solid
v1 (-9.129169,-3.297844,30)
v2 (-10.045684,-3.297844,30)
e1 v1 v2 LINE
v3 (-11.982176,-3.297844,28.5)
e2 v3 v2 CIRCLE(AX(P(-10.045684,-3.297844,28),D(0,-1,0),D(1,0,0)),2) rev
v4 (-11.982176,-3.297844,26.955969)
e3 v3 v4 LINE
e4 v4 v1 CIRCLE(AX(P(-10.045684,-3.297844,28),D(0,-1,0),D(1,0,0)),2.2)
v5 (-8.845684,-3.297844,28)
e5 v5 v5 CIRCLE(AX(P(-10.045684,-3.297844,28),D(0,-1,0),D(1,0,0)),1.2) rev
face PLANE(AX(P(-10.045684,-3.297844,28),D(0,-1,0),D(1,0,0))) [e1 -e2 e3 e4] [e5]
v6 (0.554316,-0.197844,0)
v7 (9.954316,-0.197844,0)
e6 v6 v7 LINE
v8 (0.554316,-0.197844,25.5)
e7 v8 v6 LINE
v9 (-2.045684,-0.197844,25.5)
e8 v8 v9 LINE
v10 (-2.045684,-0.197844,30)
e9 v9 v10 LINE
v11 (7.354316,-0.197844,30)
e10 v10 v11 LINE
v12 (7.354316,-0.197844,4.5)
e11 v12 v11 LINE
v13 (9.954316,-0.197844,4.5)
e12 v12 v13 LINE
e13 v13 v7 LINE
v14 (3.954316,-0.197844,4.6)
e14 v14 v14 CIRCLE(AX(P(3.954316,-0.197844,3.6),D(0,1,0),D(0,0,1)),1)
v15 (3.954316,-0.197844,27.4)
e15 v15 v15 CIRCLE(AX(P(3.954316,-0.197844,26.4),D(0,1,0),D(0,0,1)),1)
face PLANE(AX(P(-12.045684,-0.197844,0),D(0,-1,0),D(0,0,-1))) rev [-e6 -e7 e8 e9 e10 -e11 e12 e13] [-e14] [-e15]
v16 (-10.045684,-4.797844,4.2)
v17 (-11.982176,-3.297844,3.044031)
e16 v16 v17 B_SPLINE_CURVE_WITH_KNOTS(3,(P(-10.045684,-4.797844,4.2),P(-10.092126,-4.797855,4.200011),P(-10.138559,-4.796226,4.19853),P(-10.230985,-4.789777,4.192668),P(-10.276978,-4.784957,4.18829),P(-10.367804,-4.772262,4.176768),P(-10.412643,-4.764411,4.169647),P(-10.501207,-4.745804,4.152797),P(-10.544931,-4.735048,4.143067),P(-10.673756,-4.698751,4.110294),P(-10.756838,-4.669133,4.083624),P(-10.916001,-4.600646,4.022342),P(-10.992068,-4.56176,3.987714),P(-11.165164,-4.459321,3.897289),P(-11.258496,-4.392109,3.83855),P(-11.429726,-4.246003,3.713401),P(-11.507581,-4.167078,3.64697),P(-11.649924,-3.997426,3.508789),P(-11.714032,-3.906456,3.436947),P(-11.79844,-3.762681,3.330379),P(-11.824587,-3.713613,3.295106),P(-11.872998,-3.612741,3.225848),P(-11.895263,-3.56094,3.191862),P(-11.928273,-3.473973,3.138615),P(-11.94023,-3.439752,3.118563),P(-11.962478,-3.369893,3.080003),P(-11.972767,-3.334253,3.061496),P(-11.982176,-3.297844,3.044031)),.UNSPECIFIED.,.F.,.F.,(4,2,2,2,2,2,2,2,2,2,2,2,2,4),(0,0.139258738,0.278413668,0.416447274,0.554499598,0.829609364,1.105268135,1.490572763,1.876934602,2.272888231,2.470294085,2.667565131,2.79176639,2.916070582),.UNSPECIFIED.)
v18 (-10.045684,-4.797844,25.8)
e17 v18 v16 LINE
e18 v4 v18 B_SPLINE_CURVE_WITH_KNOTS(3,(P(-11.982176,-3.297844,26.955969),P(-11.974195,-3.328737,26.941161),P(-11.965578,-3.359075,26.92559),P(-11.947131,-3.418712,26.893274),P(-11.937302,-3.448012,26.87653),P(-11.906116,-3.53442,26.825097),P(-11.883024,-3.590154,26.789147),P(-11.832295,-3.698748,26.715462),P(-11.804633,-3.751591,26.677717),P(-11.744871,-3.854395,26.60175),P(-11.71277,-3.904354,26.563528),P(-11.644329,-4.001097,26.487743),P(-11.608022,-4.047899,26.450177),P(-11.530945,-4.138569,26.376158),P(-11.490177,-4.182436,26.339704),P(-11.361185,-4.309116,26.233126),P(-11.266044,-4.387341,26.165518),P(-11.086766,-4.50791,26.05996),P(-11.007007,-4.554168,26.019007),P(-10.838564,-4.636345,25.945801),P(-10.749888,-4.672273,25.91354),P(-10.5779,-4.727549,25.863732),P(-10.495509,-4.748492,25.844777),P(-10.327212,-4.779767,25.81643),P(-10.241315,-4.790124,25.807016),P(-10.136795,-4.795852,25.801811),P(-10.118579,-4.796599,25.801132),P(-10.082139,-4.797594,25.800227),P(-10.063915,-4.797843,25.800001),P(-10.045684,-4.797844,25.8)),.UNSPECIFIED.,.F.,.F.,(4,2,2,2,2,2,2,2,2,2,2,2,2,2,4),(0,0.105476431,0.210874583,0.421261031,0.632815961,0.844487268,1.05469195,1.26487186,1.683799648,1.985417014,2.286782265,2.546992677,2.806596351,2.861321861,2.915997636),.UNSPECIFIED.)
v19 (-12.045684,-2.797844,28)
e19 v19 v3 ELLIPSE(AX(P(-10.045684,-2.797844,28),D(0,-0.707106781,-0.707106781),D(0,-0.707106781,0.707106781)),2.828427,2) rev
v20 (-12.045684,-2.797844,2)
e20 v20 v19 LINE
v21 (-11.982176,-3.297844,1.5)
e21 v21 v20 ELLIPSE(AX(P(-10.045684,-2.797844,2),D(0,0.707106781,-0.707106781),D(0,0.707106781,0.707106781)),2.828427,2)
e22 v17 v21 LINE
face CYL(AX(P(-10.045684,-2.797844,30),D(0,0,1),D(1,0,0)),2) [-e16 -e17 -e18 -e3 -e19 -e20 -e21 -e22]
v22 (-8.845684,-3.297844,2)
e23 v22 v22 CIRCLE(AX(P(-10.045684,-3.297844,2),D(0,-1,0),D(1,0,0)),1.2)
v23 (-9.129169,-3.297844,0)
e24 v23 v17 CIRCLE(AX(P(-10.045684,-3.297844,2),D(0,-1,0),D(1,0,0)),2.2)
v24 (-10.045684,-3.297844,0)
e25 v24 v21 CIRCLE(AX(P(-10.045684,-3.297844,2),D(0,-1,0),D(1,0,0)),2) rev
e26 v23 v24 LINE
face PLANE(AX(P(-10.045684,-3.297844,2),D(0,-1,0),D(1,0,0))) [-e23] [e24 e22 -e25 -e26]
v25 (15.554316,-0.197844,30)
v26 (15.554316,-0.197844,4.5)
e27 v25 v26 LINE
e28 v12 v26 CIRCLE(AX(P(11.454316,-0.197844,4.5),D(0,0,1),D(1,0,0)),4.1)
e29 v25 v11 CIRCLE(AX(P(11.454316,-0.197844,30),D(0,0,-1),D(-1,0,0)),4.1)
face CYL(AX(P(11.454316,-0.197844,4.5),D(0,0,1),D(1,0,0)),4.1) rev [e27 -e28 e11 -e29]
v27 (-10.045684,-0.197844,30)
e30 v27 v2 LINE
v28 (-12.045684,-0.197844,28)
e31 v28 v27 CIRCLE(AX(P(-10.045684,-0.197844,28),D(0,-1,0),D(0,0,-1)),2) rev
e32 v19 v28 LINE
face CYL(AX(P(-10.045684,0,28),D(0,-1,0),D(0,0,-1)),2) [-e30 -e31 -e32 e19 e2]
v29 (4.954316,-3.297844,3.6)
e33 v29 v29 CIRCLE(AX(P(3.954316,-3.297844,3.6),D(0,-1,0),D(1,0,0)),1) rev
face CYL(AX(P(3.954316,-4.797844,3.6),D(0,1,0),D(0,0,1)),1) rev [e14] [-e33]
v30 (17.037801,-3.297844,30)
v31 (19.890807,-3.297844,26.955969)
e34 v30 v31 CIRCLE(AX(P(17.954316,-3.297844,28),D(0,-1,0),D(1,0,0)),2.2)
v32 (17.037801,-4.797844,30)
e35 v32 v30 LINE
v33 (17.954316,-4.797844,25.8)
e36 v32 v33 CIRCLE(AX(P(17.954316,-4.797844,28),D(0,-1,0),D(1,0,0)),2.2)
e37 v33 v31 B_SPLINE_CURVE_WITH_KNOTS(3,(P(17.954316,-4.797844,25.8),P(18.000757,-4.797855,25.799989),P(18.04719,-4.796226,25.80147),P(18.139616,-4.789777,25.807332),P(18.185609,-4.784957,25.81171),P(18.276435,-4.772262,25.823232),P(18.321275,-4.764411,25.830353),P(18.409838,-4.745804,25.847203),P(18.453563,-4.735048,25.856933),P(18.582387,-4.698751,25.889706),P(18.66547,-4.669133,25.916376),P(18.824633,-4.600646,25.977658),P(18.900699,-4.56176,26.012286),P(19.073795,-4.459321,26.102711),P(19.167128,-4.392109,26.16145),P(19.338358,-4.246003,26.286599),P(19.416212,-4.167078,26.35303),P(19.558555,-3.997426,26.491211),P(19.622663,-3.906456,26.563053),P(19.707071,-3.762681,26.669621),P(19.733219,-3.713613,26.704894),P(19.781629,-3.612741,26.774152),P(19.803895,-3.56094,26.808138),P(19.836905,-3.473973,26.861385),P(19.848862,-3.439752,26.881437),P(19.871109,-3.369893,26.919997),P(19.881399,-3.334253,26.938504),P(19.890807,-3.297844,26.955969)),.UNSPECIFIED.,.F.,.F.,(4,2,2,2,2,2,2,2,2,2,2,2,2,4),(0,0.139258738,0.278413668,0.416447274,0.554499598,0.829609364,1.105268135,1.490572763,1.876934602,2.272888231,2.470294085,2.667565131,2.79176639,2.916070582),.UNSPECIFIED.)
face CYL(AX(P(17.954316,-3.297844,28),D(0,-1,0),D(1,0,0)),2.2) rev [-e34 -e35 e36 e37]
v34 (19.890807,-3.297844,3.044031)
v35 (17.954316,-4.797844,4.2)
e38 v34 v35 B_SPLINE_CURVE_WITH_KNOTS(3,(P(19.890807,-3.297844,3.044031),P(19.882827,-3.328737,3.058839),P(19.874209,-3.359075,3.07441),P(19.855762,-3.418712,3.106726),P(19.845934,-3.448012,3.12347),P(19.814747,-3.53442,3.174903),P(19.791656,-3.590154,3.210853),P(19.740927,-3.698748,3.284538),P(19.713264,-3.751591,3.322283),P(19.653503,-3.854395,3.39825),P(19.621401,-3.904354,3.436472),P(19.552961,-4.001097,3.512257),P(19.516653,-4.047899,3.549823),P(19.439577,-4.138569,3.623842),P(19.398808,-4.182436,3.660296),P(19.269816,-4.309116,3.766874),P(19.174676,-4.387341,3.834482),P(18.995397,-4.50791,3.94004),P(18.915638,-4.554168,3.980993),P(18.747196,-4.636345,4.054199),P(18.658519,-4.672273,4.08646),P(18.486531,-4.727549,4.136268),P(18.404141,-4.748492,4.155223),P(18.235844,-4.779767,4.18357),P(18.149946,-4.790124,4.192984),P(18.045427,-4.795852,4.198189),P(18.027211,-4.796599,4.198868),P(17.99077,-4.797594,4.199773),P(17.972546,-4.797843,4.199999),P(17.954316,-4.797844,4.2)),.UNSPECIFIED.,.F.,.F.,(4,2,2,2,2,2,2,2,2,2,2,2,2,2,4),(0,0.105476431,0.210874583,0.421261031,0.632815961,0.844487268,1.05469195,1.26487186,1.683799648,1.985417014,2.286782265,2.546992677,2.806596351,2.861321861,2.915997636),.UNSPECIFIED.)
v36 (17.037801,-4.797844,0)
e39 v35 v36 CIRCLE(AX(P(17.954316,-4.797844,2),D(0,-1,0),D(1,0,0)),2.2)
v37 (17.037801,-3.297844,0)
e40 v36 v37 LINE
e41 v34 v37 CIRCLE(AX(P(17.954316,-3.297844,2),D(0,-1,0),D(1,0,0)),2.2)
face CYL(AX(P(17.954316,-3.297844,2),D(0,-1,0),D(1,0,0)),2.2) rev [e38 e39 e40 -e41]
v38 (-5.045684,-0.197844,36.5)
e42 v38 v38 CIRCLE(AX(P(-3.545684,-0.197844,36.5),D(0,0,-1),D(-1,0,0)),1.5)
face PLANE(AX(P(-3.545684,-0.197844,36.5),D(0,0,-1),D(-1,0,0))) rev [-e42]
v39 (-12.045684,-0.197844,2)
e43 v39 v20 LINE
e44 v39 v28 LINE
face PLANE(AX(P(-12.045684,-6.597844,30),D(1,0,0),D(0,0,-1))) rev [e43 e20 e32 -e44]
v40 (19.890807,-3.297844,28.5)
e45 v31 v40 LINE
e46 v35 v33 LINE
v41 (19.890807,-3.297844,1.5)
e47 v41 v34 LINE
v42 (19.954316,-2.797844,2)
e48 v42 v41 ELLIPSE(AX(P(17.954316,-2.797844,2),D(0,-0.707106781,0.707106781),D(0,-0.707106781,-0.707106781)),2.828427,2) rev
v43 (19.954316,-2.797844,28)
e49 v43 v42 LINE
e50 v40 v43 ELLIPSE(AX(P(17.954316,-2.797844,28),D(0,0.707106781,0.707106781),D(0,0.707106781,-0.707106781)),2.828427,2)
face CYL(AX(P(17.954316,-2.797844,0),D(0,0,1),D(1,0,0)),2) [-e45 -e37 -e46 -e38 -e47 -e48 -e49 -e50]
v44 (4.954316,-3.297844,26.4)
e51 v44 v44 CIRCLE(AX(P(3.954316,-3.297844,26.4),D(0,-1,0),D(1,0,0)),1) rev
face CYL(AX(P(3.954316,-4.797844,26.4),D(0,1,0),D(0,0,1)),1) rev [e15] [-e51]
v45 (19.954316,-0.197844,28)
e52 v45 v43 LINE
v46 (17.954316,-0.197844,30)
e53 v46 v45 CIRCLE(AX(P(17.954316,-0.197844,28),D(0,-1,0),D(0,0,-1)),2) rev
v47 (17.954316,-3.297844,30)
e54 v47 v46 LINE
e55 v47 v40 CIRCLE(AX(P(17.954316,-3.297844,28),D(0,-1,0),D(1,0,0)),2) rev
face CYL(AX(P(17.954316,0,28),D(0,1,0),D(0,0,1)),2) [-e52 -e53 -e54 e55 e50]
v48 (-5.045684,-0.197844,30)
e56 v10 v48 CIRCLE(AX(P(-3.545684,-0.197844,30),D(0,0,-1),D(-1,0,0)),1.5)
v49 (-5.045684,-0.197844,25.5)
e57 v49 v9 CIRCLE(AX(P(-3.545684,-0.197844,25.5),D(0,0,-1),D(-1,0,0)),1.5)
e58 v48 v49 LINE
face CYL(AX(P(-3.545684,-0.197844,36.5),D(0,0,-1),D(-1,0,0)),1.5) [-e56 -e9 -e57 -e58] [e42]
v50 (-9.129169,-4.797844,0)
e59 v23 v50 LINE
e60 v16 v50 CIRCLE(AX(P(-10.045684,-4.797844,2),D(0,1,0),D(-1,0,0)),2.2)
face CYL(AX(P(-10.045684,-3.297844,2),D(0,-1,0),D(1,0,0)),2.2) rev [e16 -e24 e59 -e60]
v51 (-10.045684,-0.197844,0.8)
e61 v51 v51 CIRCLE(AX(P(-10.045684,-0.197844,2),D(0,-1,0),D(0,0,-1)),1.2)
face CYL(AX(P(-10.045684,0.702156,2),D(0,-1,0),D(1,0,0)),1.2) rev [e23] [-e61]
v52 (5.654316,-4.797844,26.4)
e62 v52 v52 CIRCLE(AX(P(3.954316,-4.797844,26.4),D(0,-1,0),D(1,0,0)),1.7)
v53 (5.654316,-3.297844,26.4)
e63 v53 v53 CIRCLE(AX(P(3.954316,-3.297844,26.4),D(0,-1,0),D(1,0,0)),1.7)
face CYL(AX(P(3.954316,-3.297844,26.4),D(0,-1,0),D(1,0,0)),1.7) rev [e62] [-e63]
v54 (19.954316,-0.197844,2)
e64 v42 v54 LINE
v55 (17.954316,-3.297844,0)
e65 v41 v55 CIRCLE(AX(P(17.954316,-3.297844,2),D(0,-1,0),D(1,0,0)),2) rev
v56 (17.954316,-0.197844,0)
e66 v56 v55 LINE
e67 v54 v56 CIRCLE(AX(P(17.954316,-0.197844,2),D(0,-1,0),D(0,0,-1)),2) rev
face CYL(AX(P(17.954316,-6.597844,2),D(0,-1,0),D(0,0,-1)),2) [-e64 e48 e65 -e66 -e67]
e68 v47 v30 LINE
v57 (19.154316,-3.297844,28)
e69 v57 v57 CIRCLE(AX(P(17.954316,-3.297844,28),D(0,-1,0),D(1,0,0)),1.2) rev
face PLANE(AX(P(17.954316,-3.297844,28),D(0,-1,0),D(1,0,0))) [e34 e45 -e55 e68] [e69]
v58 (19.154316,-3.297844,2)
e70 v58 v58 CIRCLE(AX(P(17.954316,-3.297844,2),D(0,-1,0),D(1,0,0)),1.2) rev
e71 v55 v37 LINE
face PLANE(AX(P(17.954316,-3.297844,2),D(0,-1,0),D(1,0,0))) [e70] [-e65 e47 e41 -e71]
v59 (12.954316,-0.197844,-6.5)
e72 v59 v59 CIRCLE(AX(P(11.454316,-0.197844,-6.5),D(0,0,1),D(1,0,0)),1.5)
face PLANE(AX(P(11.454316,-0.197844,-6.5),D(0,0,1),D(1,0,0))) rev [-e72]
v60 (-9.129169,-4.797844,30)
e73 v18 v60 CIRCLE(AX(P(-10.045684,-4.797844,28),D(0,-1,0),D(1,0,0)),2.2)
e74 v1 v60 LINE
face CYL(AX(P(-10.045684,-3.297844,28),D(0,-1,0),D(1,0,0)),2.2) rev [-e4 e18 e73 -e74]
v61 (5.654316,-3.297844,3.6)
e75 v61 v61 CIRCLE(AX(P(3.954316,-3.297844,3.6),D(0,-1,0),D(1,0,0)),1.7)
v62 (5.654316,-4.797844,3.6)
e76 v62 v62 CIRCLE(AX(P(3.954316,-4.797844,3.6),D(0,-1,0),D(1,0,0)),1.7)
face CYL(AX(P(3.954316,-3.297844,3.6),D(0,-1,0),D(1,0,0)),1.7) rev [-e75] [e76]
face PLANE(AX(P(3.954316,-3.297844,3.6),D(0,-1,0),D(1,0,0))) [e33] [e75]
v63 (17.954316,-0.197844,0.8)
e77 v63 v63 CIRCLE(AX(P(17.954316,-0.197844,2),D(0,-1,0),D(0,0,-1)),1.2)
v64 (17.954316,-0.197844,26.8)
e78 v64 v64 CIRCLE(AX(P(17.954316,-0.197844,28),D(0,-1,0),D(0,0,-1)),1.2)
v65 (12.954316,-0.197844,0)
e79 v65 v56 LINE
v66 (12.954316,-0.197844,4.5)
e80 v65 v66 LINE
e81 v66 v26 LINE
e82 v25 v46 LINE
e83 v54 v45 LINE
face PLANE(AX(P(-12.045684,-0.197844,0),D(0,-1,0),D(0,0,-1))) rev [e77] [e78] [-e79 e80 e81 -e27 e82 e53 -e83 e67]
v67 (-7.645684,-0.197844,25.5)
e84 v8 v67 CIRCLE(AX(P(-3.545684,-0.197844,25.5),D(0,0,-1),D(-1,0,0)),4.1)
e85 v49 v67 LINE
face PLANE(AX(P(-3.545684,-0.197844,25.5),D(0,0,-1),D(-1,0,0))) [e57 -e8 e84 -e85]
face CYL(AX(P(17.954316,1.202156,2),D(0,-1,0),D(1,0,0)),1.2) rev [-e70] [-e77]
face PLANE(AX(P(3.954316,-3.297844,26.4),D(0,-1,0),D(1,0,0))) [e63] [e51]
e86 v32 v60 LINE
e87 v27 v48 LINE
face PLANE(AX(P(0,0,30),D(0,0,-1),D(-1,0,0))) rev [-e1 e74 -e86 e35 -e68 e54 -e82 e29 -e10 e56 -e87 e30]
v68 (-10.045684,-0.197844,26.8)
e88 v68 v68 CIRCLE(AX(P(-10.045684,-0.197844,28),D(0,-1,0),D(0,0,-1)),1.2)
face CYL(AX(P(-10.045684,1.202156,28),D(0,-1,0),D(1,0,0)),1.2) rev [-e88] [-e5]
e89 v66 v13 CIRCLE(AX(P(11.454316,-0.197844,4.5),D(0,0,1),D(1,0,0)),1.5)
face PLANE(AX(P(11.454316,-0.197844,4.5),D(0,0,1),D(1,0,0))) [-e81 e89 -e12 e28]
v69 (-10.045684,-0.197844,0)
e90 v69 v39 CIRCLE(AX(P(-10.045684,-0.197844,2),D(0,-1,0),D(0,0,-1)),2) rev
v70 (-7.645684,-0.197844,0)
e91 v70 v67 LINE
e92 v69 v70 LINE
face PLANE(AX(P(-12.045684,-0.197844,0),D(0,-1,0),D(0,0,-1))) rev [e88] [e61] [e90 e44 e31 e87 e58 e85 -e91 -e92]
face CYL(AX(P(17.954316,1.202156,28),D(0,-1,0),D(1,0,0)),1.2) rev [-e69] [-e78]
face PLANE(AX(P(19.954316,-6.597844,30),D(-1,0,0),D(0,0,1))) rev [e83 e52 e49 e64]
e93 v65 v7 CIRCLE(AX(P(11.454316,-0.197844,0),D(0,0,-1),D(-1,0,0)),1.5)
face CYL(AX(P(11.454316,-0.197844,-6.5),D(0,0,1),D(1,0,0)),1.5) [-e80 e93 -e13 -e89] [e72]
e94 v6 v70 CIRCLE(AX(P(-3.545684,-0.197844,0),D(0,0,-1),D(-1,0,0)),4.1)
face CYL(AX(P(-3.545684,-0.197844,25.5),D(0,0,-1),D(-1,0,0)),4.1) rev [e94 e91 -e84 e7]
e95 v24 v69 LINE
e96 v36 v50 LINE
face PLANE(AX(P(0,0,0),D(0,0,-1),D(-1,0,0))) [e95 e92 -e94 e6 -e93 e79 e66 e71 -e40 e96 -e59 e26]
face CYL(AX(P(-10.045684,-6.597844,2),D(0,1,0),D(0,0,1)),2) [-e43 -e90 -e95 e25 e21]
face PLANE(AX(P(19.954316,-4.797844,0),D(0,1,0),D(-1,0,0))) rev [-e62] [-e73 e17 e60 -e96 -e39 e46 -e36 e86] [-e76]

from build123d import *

# Parameters (mm, degrees)
SKETCH1_W           = 32
SKETCH1_H           = 6.5
BOSS_EXTRUDE1_DEPTH = 30
FILLET1_R           = 2
SKETCH2_R           = 4.1
CUT_EXTRUDE1_DEPTH  = 25.5
SKETCH3_R           = 4.1
CUT_EXTRUDE2_DEPTH  = 25.5
SKETCH5_W           = 32
SKETCH5_H           = 0.1
CUT_EXTRUDE3_DEPTH  = 37.629308734
SKETCH6_W           = 32
SKETCH6_H           = 1.8
CUT_EXTRUDE4_DEPTH  = 37.629308734
SKETCH7_R           = 2.2
CUT_EXTRUDE5_DEPTH  = 1.5
SKETCH8_R           = 1.2
CUT_EXTRUDE6_DEPTH  = 4
SKETCH9_R           = 1.2
CUT_EXTRUDE7_DEPTH  = 6
SKETCH10_R          = 2.2
CUT_EXTRUDE8_DEPTH  = 1.5
SKETCH11_R          = 1
CUT_EXTRUDE9_DEPTH  = 37.322647437
SKETCH12_R          = 1.7
CUT_EXTRUDE10_DEPTH = 1.5
SKETCH14_R          = 1.5
BOSS_EXTRUDE3_DEPTH = 11
SKETCH15_R          = 1.5
BOSS_EXTRUDE4_DEPTH = 11
FILLET2_R           = 2


with BuildPart() as part:
    # Sketch1 → Boss-Extrude1 (new body)
    with BuildSketch(Plane.XY):
        with Locations((3.954315745, -3.347843701)):
            Rectangle(SKETCH1_W, SKETCH1_H)
    extrude(amount=BOSS_EXTRUDE1_DEPTH)

    # Fillet1
    fillet1_edges = [part.edges().sort_by_distance(p)[0] for p in [
        (19.954315745, -3.347843701, 30),
        (-12.045684255, -3.347843701, 30),
        (19.954315745, -3.347843701, 0),
        (-12.045684255, -3.347843701, 0),
    ]]
    fillet(fillet1_edges, radius=FILLET1_R)

    # Sketch2 → Cut-Extrude1 (cut)
    with BuildSketch(Plane(origin=(0, 0, 0), x_dir=(-1, 0, 0), z_dir=(0, 0, -1))):
        with Locations((3.545684255, -0.197843701)):
            Circle(SKETCH2_R)
    extrude(amount=-CUT_EXTRUDE1_DEPTH, mode=Mode.SUBTRACT)

    # Sketch3 → Cut-Extrude2 (cut)
    with BuildSketch(Plane.XY.offset(30)):
        with Locations((11.454315745, -0.197843701)):
            Circle(SKETCH3_R)
    extrude(amount=-CUT_EXTRUDE2_DEPTH, mode=Mode.SUBTRACT)

    # Sketch5 → Cut-Extrude3 (cut, through all)
    with BuildSketch(Plane.XY.offset(30)):
        with Locations((3.954315745, -0.147843701)):
            Rectangle(SKETCH5_W, SKETCH5_H)
    extrude(amount=-CUT_EXTRUDE3_DEPTH, mode=Mode.SUBTRACT)

    # Sketch6 → Cut-Extrude4 (cut, through all)
    with BuildSketch(Plane.XY.offset(30)):
        with Locations((3.954315745, -5.697843701)):
            Rectangle(SKETCH6_W, SKETCH6_H)
    extrude(amount=-CUT_EXTRUDE4_DEPTH, mode=Mode.SUBTRACT)

    # Sketch7 → Cut-Extrude5 (cut)
    with BuildSketch(Plane.XZ.offset(4.797843701)):
        with Locations((-10.045684255, 2)):
            Circle(SKETCH7_R)
    extrude(amount=-CUT_EXTRUDE5_DEPTH, mode=Mode.SUBTRACT)

    # Sketch8 → Cut-Extrude6 (cut)
    with BuildSketch(Plane.XZ.offset(3.297843701)):
        with Locations((-10.045684255, 2)):
            Circle(SKETCH8_R)
    extrude(amount=-CUT_EXTRUDE6_DEPTH, mode=Mode.SUBTRACT)

    # Sketch9 → Cut-Extrude7 (cut)
    with BuildSketch(Plane.XZ.offset(4.797843701)):
        with Locations((-10.045684255, 28)):
            Circle(SKETCH9_R)
        with Locations((17.954315745, 28)):
            Circle(SKETCH9_R)
        with Locations((17.954315745, 2)):
            Circle(SKETCH9_R)
    extrude(amount=-CUT_EXTRUDE7_DEPTH, mode=Mode.SUBTRACT)

    # Sketch10 → Cut-Extrude8 (cut)
    with BuildSketch(Plane.XZ.offset(4.797843701)):
        with Locations((-10.045684255, 28)):
            Circle(SKETCH10_R)
        with Locations((17.954315745, 28)):
            Circle(SKETCH10_R)
        with Locations((17.954315745, 2)):
            Circle(SKETCH10_R)
    extrude(amount=-CUT_EXTRUDE8_DEPTH, mode=Mode.SUBTRACT)

    # Sketch11 → Cut-Extrude9 (cut, through all)
    with BuildSketch(Plane(origin=(0, -0.197843701, 0), x_dir=(1, 0, 0), z_dir=(0, 1, 0))):
        with Locations(Location((3.954315745, -3.6, 0), (0, 0, 270))):
            Circle(SKETCH11_R)
        with Locations(Location((3.954315745, -26.4, 0), (0, 0, 270))):
            Circle(SKETCH11_R)
    extrude(amount=-CUT_EXTRUDE9_DEPTH, mode=Mode.SUBTRACT)

    # Sketch12 → Cut-Extrude10 (cut)
    with BuildSketch(Plane.XZ.offset(4.797843701)):
        with Locations((3.954315745, 26.4)):
            Circle(SKETCH12_R)
        with Locations((3.954315745, 3.6)):
            Circle(SKETCH12_R)
    extrude(amount=-CUT_EXTRUDE10_DEPTH, mode=Mode.SUBTRACT)

    # Sketch14 → Boss-Extrude3 (add)
    with BuildSketch(Plane.XY.offset(4.5)):
        with Locations((11.454315745, -0.197843701)):
            Circle(SKETCH14_R)
    extrude(amount=-BOSS_EXTRUDE3_DEPTH)

    # Sketch15 → Boss-Extrude4 (add)
    with BuildSketch(Plane(origin=(0, 0, 25.5), x_dir=(-1, 0, 0), z_dir=(0, 0, -1))):
        with Locations((3.545684255, -0.197843701)):
            Circle(SKETCH15_R)
    extrude(amount=-BOSS_EXTRUDE4_DEPTH)

    # Fillet2
    # the kernel refuses this fillet: 2 mm, written as the material it takes off along each edge
    with BuildSketch(Plane(origin=(19.954315745, -4.797843701, 32.083484861), x_dir=(-1, 0, 0), z_dir=(0, 0, -1)), Plane(origin=(-12.045684255, -4.797843701, 32.083484861), x_dir=(0, 1, 0), z_dir=(0, 0, -1))) as fillet2_piece_1:
        with BuildLine():
            CenterArc((FILLET2_R, FILLET2_R), FILLET2_R, 180, 90)
            Line((0, FILLET2_R), (0, 0))
            Line((0, 0), (FILLET2_R, 0))
        make_face()
    extrude(amount=34.166969722, mode=Mode.SUBTRACT)


solid = part.part
